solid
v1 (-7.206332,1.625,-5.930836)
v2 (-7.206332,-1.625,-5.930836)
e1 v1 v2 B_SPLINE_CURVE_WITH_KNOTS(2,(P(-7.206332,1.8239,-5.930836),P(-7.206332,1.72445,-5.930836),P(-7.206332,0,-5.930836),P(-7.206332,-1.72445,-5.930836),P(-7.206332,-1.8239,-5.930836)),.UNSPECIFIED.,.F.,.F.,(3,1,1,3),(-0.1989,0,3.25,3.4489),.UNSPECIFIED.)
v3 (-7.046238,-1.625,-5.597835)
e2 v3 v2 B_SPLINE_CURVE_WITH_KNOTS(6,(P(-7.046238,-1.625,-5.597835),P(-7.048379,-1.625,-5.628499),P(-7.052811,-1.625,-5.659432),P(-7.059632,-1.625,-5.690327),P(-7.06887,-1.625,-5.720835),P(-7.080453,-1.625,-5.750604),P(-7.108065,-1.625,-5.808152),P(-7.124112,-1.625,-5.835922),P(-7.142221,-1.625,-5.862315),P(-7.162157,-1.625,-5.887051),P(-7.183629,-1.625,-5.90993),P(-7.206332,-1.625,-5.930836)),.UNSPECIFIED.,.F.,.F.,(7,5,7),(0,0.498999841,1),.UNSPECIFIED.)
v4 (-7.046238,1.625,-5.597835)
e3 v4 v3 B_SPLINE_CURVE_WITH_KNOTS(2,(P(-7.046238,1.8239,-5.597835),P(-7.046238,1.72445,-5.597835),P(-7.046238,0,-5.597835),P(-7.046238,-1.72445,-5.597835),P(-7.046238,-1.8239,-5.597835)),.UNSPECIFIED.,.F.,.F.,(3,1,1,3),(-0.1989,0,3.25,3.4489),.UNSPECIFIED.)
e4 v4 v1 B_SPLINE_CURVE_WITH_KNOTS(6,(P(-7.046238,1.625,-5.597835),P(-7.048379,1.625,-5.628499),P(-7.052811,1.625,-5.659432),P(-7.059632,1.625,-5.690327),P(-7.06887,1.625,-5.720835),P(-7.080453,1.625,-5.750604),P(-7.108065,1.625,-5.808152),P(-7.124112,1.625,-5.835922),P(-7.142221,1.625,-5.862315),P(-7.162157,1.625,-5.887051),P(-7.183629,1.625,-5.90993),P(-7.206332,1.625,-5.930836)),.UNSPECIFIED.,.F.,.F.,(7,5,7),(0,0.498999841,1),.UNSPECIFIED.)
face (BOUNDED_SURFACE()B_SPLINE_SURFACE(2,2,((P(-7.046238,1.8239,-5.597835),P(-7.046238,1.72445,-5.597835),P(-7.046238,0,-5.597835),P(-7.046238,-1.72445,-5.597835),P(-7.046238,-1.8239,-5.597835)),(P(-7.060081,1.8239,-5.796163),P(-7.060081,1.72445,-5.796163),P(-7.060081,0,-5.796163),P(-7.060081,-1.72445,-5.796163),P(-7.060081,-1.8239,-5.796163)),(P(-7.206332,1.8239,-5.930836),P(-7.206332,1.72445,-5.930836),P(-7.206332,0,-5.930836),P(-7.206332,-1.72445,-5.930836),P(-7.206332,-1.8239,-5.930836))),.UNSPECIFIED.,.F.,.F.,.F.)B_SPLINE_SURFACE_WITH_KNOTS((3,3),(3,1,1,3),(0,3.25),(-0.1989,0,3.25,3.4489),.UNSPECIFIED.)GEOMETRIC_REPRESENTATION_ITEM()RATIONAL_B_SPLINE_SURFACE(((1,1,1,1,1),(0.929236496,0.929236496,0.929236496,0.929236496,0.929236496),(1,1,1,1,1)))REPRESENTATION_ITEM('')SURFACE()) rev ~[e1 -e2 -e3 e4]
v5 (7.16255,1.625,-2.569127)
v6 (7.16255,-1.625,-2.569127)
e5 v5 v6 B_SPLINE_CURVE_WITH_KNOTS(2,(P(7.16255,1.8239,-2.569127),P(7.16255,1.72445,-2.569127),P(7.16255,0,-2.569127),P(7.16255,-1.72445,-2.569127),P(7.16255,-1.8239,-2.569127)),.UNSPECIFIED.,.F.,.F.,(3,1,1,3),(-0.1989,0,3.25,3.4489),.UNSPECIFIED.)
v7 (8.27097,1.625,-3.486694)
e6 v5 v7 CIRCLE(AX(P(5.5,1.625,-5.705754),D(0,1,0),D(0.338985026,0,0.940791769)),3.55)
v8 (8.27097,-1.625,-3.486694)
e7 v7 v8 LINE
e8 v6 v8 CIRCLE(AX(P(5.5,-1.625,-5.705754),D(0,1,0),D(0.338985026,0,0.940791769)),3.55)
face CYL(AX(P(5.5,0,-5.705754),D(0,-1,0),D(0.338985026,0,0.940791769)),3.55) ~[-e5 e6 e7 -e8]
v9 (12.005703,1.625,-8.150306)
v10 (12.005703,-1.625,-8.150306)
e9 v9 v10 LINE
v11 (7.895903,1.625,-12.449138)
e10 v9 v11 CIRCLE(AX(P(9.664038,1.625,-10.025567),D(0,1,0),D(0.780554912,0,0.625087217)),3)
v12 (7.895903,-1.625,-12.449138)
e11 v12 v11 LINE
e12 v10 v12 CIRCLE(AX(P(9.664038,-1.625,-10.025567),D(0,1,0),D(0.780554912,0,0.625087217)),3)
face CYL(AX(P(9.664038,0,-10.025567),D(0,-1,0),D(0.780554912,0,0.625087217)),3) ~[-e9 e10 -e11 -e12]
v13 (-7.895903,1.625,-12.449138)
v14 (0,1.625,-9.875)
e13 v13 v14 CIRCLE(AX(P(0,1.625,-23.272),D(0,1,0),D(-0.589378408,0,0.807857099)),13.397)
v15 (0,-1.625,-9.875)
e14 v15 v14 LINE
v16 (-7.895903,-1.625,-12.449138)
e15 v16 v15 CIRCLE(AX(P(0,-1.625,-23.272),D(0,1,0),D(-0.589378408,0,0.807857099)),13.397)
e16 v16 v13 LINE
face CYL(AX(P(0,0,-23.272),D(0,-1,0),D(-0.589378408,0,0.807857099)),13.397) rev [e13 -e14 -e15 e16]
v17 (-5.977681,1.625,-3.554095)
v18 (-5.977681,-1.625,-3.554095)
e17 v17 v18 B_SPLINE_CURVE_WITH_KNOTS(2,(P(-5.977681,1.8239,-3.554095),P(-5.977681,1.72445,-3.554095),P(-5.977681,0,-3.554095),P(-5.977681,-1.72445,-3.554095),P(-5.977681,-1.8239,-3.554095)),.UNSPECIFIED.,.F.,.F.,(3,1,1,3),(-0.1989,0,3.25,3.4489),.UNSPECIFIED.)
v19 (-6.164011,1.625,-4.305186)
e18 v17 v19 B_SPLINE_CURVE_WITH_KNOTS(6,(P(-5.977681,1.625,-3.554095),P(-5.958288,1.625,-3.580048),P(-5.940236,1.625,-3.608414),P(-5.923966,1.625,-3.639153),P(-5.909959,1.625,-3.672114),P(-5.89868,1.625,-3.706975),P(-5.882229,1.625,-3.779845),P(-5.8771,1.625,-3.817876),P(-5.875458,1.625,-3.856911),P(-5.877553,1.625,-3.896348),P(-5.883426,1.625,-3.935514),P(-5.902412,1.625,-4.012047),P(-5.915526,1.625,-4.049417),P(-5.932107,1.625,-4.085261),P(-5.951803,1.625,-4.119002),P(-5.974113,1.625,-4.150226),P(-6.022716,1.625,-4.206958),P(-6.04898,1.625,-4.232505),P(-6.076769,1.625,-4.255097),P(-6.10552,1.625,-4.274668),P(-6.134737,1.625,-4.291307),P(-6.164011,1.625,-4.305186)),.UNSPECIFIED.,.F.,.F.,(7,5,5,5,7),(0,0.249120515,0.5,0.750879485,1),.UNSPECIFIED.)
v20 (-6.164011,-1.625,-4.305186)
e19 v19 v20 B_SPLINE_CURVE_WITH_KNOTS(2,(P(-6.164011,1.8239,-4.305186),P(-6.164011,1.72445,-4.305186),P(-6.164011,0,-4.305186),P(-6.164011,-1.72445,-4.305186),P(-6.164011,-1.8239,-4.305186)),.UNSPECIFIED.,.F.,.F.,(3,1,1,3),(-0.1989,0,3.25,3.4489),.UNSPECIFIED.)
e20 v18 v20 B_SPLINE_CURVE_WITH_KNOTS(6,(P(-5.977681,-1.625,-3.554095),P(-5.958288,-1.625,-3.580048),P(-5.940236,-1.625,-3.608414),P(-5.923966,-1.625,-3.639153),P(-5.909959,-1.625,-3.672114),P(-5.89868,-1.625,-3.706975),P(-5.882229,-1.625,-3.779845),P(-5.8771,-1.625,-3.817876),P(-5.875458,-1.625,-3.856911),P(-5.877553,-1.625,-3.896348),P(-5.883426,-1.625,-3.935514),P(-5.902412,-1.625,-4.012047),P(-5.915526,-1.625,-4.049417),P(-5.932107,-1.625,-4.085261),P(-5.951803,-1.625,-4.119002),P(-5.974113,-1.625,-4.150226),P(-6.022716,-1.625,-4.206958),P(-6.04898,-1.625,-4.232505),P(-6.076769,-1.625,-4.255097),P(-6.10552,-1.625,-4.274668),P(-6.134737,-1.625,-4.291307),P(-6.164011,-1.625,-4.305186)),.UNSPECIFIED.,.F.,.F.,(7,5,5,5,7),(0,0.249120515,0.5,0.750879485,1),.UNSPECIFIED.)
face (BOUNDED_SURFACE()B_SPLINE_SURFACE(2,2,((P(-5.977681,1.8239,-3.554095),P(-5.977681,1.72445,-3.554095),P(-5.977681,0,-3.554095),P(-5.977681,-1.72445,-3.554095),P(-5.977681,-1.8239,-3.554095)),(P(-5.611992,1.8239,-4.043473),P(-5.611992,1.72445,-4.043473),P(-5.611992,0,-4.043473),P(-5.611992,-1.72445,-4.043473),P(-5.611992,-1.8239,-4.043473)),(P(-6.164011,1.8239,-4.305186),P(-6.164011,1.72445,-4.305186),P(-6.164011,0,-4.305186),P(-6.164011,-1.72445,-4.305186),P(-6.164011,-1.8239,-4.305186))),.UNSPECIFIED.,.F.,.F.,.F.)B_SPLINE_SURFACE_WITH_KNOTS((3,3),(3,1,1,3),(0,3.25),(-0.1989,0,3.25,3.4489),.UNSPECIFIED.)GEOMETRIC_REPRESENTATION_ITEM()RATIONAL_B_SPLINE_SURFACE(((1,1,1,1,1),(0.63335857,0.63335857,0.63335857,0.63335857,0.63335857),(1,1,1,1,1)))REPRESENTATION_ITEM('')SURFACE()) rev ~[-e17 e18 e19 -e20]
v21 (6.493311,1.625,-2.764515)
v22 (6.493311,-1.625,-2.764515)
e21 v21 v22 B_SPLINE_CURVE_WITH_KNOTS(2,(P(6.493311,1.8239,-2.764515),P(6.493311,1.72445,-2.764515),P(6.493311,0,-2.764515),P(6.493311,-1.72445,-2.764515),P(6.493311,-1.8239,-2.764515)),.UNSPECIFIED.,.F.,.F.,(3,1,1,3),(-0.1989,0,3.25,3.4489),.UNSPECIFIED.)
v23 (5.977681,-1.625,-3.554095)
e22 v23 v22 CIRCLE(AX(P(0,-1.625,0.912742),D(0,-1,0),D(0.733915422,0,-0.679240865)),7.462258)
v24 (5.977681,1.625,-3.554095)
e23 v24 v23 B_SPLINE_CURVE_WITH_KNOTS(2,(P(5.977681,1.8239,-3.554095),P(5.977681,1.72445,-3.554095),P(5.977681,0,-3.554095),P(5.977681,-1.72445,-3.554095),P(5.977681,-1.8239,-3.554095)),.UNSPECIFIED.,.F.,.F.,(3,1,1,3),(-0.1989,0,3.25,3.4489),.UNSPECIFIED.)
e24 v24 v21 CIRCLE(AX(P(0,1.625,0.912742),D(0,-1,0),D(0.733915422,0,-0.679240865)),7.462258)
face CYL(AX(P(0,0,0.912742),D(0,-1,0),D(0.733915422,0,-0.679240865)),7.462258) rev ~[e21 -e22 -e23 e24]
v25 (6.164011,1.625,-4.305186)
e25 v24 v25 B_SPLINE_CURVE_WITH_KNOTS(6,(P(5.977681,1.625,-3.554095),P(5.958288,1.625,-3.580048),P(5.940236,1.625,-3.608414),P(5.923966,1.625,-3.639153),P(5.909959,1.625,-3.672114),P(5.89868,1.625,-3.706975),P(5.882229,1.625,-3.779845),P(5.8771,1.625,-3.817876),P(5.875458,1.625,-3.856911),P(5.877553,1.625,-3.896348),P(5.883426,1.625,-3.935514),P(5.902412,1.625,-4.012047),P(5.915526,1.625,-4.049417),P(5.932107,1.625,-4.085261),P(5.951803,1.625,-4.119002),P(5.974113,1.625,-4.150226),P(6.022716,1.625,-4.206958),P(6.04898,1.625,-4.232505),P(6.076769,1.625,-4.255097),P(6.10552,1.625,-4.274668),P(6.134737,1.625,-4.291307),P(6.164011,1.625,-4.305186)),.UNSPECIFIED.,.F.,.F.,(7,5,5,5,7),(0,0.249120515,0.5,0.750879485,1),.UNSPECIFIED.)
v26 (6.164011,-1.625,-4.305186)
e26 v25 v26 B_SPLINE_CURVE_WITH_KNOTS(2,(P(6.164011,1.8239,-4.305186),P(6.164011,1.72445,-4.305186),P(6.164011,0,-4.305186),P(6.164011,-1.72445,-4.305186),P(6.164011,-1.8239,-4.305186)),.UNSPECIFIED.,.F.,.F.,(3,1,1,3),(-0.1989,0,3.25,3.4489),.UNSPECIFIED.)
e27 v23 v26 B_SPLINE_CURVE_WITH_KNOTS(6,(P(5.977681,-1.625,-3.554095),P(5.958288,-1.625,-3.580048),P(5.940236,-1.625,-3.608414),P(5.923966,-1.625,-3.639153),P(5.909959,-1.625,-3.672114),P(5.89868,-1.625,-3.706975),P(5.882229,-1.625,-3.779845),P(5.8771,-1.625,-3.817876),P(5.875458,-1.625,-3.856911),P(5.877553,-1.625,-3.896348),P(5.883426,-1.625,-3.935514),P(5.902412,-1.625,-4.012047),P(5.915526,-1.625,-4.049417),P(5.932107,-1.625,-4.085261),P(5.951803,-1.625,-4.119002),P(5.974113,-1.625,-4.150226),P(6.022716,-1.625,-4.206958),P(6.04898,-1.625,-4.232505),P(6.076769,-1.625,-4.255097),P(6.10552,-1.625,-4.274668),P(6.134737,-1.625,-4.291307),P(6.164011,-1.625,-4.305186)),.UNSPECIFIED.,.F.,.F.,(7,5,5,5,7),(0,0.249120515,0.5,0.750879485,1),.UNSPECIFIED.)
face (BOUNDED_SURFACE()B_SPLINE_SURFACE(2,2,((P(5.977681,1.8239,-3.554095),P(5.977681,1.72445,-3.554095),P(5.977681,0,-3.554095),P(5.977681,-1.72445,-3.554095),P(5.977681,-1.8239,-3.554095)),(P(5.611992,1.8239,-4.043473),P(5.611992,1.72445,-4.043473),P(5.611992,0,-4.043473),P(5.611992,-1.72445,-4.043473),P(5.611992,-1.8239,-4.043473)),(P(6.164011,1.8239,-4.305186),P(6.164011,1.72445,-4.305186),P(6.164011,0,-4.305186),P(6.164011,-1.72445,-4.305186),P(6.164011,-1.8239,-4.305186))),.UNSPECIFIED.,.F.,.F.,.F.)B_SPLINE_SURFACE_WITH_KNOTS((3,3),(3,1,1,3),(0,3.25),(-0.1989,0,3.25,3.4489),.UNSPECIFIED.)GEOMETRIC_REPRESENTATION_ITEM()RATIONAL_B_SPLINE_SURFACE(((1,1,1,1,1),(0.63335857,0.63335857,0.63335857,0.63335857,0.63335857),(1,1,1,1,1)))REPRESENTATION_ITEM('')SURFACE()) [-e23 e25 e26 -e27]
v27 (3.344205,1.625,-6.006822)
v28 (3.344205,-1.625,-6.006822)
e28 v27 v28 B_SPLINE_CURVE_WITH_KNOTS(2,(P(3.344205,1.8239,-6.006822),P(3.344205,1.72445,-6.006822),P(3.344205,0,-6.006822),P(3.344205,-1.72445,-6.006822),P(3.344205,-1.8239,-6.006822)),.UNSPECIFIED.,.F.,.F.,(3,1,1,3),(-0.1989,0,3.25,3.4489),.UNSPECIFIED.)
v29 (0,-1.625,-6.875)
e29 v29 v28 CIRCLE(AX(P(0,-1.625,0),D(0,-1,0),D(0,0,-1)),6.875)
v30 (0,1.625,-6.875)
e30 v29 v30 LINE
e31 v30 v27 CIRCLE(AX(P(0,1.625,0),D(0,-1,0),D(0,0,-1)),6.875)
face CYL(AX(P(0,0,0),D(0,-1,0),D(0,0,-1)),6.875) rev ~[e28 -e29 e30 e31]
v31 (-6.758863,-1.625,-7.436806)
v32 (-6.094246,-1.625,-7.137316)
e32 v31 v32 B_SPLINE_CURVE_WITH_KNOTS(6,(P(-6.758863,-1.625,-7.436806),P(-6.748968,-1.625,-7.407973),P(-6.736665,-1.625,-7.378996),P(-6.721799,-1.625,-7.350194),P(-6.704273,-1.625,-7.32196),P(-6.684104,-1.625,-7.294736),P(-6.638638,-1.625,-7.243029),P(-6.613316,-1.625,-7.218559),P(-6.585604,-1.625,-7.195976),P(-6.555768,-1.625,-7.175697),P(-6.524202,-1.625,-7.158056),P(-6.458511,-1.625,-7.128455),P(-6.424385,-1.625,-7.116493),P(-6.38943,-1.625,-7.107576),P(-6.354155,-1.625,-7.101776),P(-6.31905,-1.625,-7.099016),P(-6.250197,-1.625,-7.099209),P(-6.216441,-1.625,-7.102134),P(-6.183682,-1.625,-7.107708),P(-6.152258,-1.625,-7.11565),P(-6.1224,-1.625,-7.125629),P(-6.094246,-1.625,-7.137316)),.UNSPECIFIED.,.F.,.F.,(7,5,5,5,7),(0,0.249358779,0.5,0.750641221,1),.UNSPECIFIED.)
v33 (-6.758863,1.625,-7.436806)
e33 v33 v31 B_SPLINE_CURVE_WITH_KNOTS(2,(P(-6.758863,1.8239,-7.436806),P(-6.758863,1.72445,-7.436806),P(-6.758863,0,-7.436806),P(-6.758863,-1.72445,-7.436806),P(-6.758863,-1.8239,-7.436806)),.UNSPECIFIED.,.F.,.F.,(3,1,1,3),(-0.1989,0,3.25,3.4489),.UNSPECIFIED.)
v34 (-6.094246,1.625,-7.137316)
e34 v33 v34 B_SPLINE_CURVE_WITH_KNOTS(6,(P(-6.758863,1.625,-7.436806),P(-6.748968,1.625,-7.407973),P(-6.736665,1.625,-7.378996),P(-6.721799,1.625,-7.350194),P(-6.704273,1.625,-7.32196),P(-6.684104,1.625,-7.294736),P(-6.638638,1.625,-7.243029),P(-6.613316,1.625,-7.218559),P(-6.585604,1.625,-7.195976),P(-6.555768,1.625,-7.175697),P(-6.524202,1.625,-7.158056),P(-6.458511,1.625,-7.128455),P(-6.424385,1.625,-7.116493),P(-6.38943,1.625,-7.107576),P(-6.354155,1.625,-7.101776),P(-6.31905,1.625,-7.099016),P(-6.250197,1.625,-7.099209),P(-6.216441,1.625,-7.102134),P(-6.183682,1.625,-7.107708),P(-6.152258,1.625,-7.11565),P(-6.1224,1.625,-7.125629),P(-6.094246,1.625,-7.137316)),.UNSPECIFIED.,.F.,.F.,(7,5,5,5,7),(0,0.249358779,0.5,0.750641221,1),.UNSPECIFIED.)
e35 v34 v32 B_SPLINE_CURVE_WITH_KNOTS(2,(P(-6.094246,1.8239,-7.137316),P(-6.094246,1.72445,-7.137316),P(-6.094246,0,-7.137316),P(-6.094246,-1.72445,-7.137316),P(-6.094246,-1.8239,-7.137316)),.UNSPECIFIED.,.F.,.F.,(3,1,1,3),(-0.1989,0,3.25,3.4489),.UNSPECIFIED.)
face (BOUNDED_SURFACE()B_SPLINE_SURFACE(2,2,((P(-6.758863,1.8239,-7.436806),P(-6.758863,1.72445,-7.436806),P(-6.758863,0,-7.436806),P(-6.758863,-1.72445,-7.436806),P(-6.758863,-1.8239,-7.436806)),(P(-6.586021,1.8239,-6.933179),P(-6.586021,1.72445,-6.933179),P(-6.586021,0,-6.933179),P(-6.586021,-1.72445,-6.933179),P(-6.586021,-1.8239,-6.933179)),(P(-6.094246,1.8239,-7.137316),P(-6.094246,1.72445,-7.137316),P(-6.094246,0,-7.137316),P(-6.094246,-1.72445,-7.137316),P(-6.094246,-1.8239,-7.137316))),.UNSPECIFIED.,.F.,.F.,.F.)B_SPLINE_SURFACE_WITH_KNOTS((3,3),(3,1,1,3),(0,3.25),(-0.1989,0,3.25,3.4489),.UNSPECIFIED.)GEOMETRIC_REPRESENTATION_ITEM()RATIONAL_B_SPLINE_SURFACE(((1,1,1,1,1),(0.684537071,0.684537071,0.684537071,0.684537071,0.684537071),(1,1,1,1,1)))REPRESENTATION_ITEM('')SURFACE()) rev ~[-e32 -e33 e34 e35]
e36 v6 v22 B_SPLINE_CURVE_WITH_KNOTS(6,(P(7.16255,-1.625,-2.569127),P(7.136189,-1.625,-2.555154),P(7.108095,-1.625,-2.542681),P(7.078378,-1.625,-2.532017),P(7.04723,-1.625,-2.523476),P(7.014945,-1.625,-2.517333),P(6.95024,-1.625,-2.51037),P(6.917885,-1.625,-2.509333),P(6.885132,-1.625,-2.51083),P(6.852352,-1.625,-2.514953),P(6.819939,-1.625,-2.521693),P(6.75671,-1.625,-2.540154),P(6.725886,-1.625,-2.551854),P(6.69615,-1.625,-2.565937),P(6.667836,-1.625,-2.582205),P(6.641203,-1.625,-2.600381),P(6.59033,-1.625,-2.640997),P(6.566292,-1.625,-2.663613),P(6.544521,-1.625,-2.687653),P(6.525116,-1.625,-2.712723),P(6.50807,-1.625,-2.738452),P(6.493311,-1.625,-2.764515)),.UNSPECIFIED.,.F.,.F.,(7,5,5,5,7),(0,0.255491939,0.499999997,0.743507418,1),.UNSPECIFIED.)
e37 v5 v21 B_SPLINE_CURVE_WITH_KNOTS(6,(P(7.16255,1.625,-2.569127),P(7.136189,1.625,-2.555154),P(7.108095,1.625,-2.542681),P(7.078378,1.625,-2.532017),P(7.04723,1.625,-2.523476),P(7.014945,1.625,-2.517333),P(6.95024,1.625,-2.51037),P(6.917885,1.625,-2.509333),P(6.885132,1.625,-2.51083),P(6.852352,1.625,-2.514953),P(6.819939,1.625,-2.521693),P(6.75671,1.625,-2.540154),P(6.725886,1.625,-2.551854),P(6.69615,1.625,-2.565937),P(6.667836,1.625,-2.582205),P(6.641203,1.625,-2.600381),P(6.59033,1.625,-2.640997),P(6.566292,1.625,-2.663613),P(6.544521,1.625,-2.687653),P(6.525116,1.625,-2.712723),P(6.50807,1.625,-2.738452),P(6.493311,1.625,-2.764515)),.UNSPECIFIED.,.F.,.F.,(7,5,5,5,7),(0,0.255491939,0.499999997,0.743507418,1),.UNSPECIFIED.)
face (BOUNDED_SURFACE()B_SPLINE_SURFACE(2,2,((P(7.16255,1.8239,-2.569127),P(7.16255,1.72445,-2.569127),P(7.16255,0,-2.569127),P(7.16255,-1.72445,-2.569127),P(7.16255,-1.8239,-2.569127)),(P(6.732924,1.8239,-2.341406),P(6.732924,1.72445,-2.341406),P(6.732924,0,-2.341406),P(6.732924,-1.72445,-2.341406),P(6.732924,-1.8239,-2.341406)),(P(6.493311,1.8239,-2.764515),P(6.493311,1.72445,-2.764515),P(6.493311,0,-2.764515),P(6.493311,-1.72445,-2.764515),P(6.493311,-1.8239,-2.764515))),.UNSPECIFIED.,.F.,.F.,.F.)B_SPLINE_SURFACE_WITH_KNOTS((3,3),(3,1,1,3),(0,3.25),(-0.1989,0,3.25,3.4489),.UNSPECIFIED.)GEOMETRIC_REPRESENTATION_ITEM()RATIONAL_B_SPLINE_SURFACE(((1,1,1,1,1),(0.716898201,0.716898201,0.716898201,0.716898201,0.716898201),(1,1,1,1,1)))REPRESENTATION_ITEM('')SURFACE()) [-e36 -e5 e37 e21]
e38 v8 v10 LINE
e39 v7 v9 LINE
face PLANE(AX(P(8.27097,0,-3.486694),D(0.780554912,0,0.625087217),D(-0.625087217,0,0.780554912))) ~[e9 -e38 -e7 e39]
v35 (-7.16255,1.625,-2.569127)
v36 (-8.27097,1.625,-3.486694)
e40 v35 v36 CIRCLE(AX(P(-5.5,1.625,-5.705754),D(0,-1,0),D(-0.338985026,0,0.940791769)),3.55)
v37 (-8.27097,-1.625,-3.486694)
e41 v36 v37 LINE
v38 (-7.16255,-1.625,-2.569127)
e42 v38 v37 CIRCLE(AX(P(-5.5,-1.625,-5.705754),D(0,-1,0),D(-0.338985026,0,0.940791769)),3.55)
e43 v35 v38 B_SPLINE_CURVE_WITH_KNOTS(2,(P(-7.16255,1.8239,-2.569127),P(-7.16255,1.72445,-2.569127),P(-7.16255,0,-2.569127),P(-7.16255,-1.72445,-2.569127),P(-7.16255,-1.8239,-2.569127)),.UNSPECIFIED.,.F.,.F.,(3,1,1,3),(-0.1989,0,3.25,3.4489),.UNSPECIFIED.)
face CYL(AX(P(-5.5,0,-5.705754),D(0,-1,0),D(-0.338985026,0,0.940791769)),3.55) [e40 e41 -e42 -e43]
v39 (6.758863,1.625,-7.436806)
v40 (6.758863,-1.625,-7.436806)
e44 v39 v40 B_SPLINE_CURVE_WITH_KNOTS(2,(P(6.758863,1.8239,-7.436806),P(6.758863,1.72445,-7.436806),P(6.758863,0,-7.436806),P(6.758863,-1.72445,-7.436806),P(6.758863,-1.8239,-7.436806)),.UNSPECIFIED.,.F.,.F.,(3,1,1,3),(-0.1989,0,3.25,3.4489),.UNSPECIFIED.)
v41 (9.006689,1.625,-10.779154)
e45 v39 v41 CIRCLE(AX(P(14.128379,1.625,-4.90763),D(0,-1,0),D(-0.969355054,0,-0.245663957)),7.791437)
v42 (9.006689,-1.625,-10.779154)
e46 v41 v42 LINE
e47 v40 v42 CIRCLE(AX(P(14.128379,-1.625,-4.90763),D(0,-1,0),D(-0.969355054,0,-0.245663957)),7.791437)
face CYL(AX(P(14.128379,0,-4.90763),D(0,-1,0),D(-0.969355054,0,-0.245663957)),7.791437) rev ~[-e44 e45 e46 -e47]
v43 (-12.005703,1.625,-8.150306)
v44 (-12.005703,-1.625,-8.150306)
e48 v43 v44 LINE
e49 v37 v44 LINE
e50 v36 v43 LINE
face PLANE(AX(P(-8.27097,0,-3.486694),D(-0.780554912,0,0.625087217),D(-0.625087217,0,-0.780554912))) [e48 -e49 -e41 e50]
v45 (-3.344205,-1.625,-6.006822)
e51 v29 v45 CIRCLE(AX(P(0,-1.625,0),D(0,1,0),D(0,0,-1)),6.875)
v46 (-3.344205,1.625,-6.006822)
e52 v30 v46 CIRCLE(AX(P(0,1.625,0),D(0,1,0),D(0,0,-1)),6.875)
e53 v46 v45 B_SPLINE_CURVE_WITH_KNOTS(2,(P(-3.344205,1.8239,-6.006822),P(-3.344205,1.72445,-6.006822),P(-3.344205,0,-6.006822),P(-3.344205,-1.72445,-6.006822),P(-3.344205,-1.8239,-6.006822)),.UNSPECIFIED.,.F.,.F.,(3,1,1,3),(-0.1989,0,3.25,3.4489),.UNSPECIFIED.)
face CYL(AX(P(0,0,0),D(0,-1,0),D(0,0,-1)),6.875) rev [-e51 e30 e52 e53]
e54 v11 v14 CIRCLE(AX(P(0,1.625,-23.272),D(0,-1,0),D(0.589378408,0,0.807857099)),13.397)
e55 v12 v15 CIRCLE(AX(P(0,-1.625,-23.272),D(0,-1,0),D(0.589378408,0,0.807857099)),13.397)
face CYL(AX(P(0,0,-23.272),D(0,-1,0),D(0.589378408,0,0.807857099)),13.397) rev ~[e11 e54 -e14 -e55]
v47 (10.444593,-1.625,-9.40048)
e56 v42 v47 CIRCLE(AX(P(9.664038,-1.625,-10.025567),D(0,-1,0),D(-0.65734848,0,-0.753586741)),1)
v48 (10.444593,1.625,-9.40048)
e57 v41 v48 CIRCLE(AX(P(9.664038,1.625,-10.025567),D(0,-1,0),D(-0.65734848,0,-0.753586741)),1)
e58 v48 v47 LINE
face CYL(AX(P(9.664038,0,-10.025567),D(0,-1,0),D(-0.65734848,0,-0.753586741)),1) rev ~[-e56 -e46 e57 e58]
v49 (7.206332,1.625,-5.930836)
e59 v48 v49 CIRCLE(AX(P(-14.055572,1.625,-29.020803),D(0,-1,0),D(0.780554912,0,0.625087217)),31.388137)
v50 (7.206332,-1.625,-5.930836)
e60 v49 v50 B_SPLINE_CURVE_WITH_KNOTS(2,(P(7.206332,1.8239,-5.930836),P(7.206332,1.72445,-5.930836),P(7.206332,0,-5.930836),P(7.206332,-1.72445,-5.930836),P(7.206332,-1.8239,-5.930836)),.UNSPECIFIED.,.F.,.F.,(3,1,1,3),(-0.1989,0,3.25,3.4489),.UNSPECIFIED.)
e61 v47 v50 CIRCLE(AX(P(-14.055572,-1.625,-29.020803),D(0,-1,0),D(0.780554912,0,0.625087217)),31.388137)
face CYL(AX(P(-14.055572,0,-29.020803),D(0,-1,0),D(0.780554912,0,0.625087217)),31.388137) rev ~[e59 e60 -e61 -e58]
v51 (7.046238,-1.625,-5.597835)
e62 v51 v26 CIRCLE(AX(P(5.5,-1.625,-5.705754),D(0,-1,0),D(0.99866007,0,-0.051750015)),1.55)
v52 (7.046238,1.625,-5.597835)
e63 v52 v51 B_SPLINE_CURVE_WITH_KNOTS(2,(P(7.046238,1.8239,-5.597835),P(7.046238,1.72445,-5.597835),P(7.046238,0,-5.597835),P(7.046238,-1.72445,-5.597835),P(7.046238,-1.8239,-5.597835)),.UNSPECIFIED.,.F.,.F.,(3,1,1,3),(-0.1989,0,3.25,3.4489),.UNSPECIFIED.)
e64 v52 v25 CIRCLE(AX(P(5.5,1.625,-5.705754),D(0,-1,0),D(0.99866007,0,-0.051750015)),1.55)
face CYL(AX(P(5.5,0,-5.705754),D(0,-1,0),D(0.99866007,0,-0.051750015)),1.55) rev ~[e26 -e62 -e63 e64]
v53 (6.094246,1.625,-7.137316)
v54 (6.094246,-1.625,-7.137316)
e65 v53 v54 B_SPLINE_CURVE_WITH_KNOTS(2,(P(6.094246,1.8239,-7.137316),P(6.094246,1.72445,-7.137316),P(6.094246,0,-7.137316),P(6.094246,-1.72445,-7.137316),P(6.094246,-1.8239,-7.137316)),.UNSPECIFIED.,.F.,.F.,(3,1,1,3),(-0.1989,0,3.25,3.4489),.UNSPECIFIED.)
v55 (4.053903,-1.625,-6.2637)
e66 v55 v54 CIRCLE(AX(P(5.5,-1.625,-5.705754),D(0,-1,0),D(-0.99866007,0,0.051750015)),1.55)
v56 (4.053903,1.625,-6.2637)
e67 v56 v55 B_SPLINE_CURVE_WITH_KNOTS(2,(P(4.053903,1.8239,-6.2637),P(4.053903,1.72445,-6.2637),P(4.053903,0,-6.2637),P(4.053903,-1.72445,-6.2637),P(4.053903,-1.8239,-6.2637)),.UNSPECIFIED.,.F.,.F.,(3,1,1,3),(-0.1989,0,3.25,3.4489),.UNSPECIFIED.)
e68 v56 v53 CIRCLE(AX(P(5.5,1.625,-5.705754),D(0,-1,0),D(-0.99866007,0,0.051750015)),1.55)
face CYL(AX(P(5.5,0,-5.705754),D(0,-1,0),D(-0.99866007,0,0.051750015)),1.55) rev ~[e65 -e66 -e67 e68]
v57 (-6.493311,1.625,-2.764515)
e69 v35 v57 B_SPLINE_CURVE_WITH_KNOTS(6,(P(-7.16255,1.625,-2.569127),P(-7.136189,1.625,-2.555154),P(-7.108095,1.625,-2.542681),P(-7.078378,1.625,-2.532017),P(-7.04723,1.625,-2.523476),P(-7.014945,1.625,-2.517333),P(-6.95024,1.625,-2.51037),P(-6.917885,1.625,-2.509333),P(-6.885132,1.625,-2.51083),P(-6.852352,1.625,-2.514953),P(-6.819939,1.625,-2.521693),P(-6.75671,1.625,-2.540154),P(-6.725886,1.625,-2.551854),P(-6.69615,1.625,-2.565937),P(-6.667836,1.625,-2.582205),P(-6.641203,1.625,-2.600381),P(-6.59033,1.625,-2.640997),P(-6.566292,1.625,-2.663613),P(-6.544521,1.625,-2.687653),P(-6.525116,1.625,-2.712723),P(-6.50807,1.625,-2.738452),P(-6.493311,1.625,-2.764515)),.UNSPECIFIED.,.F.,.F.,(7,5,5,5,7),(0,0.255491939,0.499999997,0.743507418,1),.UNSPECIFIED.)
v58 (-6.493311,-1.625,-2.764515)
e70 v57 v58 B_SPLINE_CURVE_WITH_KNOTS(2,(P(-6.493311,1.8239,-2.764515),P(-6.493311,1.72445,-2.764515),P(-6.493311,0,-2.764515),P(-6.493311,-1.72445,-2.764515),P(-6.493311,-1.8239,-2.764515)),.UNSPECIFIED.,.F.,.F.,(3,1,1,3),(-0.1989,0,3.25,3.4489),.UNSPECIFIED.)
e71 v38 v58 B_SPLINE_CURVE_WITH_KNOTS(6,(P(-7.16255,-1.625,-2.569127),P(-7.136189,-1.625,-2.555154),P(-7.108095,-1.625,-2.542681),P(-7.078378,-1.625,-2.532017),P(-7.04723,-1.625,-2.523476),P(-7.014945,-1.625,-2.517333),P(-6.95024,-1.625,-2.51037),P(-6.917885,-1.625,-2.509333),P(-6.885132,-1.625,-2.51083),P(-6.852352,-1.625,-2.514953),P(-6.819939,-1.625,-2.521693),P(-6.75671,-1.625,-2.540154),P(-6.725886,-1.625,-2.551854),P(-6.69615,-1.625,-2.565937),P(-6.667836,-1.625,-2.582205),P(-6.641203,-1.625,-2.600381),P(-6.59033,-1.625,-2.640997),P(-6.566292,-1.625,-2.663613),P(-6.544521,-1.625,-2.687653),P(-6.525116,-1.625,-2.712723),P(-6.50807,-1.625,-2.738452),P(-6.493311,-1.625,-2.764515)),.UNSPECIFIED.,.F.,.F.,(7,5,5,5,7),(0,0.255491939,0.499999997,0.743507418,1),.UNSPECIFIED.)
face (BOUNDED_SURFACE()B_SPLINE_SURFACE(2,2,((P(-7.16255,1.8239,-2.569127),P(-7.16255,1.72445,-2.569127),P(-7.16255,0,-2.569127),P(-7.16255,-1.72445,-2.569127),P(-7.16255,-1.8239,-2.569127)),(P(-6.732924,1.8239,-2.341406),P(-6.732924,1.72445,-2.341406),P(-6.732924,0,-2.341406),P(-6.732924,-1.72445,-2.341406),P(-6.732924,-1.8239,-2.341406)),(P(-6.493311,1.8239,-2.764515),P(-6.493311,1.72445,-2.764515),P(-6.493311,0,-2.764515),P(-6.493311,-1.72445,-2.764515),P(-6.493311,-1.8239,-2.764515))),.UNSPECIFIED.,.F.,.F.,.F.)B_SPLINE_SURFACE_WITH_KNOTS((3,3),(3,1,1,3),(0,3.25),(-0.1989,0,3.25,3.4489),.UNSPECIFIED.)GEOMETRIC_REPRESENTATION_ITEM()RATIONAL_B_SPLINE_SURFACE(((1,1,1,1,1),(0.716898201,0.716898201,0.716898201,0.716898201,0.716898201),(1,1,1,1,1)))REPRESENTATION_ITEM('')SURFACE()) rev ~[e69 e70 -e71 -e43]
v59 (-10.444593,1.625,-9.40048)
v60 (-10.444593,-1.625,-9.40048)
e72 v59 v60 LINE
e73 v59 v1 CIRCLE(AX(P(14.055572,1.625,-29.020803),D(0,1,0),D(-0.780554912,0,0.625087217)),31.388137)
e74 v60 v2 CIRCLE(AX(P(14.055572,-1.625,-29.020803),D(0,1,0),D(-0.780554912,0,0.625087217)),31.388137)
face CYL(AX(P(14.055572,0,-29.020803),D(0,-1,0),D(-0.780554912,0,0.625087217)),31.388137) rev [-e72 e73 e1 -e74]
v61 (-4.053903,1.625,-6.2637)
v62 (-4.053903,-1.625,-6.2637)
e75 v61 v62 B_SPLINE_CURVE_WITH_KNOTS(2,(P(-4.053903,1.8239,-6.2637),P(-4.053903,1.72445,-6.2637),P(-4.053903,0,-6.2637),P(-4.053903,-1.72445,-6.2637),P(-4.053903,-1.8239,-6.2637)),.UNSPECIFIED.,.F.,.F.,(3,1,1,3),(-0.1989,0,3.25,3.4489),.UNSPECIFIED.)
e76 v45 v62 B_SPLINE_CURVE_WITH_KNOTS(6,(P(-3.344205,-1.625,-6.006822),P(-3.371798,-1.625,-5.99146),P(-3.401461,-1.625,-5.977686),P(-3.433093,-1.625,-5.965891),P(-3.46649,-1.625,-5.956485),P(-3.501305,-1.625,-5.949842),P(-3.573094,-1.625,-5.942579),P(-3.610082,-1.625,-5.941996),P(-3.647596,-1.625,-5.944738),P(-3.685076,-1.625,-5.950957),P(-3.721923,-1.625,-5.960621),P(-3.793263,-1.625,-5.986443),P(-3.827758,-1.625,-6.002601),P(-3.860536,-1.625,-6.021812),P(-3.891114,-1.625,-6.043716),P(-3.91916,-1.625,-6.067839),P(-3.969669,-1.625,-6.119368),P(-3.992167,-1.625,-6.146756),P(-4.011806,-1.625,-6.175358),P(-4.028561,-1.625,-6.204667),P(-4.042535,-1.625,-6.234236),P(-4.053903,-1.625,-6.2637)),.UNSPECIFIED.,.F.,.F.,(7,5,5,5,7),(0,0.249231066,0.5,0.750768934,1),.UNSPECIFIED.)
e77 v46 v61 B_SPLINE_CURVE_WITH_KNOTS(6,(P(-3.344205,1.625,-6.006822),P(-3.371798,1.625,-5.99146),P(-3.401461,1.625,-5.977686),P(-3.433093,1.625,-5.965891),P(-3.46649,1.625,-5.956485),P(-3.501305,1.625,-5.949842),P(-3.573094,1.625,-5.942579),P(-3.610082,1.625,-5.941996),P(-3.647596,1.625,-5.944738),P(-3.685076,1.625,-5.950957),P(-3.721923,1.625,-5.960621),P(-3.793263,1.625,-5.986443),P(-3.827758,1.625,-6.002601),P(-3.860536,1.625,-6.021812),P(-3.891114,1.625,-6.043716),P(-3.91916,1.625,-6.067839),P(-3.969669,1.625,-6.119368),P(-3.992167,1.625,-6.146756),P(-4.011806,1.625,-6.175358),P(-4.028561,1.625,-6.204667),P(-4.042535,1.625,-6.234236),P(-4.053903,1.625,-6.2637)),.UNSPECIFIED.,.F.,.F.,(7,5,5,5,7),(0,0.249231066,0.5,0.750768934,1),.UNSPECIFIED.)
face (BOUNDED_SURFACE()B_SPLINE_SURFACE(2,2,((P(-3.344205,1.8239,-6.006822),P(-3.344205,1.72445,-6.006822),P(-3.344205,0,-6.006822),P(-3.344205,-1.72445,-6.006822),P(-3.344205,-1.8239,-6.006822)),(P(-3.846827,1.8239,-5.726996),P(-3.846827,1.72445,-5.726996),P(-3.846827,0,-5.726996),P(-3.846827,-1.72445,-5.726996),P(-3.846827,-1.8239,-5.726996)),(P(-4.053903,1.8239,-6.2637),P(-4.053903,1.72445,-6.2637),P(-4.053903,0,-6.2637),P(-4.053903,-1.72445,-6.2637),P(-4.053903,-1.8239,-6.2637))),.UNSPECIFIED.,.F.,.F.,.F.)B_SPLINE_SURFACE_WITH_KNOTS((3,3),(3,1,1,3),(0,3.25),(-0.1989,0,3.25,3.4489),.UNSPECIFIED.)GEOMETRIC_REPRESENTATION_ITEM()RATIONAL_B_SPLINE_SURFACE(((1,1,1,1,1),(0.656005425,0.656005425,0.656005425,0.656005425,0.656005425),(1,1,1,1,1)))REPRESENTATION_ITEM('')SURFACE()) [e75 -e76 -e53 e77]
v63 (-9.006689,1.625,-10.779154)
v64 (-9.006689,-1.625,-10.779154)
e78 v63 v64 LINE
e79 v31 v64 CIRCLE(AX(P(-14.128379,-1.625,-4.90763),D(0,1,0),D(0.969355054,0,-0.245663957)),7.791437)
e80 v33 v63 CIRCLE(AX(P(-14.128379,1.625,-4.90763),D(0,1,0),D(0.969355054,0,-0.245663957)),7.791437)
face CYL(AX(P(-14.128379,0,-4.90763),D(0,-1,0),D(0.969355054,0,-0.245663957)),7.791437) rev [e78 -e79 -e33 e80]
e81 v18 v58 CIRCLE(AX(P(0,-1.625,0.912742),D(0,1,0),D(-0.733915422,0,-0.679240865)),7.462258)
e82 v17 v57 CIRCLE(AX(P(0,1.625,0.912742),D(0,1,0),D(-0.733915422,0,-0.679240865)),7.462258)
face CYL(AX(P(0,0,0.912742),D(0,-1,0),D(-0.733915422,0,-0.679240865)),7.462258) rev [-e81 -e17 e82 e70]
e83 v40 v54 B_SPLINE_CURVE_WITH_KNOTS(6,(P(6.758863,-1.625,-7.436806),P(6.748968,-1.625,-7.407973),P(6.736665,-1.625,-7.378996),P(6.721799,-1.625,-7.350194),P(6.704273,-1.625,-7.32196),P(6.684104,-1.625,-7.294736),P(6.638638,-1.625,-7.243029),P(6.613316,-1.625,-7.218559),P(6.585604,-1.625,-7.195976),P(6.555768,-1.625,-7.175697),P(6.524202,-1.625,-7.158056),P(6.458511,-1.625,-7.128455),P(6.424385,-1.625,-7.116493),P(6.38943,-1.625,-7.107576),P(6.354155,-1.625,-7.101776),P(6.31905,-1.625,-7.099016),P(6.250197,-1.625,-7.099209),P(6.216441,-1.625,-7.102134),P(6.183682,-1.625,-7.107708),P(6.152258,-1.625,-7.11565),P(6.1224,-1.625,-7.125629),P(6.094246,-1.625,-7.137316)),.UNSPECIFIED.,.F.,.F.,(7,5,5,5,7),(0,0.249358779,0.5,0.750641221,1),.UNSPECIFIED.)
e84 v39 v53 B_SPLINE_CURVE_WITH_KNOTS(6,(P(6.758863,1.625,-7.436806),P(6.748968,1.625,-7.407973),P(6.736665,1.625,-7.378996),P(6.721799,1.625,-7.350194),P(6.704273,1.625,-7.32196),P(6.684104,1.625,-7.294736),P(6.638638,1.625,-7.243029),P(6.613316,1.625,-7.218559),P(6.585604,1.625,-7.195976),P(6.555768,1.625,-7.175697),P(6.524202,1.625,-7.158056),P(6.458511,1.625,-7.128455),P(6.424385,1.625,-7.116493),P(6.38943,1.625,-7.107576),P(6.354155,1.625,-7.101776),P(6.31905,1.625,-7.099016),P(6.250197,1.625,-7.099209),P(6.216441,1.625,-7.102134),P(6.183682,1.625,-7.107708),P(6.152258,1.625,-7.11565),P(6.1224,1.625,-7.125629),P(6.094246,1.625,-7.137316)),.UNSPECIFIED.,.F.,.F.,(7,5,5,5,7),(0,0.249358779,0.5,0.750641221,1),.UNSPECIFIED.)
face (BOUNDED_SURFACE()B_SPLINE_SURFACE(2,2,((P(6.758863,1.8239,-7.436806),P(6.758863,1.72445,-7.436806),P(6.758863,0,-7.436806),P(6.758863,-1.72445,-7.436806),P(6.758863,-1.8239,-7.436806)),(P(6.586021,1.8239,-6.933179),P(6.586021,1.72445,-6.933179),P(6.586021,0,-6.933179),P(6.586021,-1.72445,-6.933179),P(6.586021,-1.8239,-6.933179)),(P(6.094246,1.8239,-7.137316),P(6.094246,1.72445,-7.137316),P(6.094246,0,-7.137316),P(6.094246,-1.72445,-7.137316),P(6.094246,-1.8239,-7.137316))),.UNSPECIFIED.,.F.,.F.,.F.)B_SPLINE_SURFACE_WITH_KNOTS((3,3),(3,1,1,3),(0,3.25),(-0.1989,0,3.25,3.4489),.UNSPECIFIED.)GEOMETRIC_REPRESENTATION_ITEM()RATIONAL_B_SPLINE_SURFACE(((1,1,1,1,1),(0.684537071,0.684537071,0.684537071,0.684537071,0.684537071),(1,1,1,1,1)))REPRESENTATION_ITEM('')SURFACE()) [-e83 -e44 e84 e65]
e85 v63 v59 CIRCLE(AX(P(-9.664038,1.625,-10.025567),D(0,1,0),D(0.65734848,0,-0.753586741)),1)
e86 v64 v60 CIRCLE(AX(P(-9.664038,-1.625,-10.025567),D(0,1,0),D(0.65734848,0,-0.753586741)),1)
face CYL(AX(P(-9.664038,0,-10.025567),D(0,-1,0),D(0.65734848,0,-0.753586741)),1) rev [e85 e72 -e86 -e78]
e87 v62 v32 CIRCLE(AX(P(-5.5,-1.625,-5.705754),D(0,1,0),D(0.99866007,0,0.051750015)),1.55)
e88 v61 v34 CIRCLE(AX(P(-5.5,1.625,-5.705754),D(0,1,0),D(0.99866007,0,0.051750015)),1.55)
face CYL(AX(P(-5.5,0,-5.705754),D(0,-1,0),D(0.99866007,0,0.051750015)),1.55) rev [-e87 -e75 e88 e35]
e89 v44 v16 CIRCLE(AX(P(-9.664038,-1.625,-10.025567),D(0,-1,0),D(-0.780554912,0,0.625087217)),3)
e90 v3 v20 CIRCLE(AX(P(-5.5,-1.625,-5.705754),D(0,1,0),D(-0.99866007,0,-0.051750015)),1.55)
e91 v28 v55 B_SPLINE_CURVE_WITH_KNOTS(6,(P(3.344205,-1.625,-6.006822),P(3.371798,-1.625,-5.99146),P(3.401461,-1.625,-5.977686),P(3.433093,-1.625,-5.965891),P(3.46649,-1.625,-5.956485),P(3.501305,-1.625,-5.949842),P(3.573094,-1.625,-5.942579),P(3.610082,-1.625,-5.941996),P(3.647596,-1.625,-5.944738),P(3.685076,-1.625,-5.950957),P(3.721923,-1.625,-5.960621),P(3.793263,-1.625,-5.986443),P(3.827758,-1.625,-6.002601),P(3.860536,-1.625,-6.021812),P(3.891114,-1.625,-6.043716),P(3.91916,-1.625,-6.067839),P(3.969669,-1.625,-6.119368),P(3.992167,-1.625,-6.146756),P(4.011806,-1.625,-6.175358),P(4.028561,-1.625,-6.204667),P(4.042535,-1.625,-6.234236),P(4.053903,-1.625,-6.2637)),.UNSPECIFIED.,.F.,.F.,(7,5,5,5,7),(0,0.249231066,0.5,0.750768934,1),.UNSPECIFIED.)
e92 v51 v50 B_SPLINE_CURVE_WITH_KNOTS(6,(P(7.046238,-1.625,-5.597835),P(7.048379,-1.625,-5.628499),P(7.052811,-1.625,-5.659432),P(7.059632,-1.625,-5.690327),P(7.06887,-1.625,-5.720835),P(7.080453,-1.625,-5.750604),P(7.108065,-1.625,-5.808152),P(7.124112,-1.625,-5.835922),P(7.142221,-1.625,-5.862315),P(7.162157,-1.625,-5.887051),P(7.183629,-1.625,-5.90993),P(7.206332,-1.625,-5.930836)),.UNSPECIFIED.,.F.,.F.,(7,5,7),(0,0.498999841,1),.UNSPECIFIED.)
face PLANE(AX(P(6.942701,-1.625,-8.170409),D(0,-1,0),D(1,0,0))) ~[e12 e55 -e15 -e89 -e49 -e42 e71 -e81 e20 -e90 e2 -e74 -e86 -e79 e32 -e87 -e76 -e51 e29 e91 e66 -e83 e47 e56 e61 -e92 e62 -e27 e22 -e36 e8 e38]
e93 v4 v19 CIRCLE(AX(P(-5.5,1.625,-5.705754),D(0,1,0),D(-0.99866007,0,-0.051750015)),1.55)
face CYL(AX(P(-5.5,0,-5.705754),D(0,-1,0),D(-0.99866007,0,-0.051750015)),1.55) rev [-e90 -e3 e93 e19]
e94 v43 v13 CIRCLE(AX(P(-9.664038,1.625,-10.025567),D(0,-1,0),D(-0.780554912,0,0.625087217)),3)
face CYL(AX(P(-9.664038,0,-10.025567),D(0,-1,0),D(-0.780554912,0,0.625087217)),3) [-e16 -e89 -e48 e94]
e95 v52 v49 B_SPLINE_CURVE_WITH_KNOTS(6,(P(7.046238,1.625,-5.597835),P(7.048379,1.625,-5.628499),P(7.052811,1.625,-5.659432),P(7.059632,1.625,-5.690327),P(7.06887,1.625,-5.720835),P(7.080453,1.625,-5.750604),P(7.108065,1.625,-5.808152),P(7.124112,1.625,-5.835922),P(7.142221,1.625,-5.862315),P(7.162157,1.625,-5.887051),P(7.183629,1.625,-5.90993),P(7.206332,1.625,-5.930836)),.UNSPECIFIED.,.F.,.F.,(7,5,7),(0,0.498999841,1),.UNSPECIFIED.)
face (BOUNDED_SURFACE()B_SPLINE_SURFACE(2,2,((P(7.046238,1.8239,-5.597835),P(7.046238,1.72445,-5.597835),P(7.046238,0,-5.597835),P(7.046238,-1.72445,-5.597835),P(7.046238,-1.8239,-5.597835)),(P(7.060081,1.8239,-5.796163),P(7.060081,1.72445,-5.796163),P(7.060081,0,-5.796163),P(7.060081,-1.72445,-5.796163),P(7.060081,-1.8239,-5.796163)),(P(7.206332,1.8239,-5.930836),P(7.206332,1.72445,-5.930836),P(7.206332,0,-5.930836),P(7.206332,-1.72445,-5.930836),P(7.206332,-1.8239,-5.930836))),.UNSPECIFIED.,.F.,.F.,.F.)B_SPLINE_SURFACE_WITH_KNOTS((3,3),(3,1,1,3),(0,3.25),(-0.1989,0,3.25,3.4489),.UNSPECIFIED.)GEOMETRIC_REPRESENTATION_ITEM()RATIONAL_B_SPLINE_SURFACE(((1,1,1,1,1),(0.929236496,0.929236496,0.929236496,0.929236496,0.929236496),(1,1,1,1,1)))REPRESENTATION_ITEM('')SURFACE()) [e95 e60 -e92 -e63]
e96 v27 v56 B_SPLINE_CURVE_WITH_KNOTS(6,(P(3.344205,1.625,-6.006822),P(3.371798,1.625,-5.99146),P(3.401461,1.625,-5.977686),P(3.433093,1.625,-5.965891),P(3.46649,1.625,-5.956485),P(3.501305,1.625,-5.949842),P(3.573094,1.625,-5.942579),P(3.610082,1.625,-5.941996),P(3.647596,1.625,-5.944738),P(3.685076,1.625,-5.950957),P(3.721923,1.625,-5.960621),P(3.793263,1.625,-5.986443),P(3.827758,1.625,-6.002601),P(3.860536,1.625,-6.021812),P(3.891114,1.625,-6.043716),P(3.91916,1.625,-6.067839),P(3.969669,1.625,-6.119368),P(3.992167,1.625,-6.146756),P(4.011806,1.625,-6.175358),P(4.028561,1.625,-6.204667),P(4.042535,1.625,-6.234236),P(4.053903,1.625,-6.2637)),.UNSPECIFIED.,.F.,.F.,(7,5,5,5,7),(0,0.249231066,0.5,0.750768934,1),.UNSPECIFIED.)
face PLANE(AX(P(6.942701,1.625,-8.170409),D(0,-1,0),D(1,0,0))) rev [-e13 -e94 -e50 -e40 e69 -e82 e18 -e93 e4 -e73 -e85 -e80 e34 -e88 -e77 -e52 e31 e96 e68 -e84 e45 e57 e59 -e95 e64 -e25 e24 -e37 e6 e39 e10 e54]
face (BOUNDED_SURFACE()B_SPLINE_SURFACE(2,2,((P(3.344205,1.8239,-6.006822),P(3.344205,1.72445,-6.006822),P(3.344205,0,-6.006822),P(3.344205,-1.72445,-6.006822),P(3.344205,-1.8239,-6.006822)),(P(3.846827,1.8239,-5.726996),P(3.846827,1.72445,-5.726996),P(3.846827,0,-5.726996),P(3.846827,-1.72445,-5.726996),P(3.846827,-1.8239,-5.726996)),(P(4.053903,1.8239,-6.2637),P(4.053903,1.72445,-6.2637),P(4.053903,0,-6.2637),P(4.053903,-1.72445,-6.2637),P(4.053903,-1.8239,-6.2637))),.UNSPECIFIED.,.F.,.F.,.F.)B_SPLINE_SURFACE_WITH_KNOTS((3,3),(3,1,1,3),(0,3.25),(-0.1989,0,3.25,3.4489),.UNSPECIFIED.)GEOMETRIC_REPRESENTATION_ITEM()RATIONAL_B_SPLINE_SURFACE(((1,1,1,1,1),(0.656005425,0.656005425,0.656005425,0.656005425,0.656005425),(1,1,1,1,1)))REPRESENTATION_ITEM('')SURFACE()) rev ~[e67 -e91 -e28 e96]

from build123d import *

# Parameters (mm, degrees)
F2_DEPTH = 1.625
F3_R     = 0.5


with BuildPart() as f2:
    # F1 (on Front) → F2 (new body, symmetric)
    with BuildSketch(Plane.XZ):
        with BuildLine():
            ThreePointArc((0, -6.875), (-2.0724417463, -6.5551971906), (-3.9520768911, -5.6255411515))
            ThreePointArc((-3.9520768911, -5.6255411515), (-4.8570002775, -7.1160909953), (-6.5757097792, -6.8217054979))
            ThreePointArc((-6.5757097792, -6.8217054979), (-7.4894639741, -8.9857797177), (-9.0066893746, -10.7791539234))
            ThreePointArc((-9.0066893746, -10.7791539234), (-10.3561219729, -10.7473840389), (-10.4445927673, -9.400479966))
            ThreePointArc((-10.4445927673, -9.400479966), (-8.8177667586, -7.5260240462), (-7.0479231089, -5.7859661986))
            ThreePointArc((-7.0479231089, -5.7859661986), (-6.6159518229, -4.6300438958), (-5.4766665535, -4.1559293139))
            ThreePointArc((-5.4766665535, -4.1559293139), (-6.1554446566, -3.3057655277), (-6.7033968415, -2.3659428957))
            ThreePointArc((-6.7033968415, -2.3659428957), (-7.5646836603, -2.8179203379), (-8.2709699391, -3.4866940551))
            Line((-8.2709699391, -3.4866940551), (-12.0057025921, -8.1503055323))
            ThreePointArc((-12.0057025921, -8.1503055323), (-11.8324993376, -12.098674705), (-7.8959026306, -12.4491384793))
            ThreePointArc((-7.8959026306, -12.4491384793), (-4.1524531082, -10.534781214), (0, -9.875))
            Line((0, -9.875), (0, -6.875))
        make_face()
    extrude(amount=F2_DEPTH, both=True)

    # F3
    f3_edges = [f2.edges().sort_by_distance(p)[0] for p in [
        (-3.952077, 0, -5.625541),
        (-7.047923, 0, -5.785966),
        (-6.703397, 0, -2.365943),
        (-5.476667, 0, -4.155929),
        (-6.57571, 0, -6.821705),
    ]]
    fillet(f3_edges, radius=F3_R)

    # F4: F2 across plane


with BuildPart() as f2_1:
    add(f2.part)
    add(f2.part.mirror(Plane.YZ))


solid = f2_1.part
